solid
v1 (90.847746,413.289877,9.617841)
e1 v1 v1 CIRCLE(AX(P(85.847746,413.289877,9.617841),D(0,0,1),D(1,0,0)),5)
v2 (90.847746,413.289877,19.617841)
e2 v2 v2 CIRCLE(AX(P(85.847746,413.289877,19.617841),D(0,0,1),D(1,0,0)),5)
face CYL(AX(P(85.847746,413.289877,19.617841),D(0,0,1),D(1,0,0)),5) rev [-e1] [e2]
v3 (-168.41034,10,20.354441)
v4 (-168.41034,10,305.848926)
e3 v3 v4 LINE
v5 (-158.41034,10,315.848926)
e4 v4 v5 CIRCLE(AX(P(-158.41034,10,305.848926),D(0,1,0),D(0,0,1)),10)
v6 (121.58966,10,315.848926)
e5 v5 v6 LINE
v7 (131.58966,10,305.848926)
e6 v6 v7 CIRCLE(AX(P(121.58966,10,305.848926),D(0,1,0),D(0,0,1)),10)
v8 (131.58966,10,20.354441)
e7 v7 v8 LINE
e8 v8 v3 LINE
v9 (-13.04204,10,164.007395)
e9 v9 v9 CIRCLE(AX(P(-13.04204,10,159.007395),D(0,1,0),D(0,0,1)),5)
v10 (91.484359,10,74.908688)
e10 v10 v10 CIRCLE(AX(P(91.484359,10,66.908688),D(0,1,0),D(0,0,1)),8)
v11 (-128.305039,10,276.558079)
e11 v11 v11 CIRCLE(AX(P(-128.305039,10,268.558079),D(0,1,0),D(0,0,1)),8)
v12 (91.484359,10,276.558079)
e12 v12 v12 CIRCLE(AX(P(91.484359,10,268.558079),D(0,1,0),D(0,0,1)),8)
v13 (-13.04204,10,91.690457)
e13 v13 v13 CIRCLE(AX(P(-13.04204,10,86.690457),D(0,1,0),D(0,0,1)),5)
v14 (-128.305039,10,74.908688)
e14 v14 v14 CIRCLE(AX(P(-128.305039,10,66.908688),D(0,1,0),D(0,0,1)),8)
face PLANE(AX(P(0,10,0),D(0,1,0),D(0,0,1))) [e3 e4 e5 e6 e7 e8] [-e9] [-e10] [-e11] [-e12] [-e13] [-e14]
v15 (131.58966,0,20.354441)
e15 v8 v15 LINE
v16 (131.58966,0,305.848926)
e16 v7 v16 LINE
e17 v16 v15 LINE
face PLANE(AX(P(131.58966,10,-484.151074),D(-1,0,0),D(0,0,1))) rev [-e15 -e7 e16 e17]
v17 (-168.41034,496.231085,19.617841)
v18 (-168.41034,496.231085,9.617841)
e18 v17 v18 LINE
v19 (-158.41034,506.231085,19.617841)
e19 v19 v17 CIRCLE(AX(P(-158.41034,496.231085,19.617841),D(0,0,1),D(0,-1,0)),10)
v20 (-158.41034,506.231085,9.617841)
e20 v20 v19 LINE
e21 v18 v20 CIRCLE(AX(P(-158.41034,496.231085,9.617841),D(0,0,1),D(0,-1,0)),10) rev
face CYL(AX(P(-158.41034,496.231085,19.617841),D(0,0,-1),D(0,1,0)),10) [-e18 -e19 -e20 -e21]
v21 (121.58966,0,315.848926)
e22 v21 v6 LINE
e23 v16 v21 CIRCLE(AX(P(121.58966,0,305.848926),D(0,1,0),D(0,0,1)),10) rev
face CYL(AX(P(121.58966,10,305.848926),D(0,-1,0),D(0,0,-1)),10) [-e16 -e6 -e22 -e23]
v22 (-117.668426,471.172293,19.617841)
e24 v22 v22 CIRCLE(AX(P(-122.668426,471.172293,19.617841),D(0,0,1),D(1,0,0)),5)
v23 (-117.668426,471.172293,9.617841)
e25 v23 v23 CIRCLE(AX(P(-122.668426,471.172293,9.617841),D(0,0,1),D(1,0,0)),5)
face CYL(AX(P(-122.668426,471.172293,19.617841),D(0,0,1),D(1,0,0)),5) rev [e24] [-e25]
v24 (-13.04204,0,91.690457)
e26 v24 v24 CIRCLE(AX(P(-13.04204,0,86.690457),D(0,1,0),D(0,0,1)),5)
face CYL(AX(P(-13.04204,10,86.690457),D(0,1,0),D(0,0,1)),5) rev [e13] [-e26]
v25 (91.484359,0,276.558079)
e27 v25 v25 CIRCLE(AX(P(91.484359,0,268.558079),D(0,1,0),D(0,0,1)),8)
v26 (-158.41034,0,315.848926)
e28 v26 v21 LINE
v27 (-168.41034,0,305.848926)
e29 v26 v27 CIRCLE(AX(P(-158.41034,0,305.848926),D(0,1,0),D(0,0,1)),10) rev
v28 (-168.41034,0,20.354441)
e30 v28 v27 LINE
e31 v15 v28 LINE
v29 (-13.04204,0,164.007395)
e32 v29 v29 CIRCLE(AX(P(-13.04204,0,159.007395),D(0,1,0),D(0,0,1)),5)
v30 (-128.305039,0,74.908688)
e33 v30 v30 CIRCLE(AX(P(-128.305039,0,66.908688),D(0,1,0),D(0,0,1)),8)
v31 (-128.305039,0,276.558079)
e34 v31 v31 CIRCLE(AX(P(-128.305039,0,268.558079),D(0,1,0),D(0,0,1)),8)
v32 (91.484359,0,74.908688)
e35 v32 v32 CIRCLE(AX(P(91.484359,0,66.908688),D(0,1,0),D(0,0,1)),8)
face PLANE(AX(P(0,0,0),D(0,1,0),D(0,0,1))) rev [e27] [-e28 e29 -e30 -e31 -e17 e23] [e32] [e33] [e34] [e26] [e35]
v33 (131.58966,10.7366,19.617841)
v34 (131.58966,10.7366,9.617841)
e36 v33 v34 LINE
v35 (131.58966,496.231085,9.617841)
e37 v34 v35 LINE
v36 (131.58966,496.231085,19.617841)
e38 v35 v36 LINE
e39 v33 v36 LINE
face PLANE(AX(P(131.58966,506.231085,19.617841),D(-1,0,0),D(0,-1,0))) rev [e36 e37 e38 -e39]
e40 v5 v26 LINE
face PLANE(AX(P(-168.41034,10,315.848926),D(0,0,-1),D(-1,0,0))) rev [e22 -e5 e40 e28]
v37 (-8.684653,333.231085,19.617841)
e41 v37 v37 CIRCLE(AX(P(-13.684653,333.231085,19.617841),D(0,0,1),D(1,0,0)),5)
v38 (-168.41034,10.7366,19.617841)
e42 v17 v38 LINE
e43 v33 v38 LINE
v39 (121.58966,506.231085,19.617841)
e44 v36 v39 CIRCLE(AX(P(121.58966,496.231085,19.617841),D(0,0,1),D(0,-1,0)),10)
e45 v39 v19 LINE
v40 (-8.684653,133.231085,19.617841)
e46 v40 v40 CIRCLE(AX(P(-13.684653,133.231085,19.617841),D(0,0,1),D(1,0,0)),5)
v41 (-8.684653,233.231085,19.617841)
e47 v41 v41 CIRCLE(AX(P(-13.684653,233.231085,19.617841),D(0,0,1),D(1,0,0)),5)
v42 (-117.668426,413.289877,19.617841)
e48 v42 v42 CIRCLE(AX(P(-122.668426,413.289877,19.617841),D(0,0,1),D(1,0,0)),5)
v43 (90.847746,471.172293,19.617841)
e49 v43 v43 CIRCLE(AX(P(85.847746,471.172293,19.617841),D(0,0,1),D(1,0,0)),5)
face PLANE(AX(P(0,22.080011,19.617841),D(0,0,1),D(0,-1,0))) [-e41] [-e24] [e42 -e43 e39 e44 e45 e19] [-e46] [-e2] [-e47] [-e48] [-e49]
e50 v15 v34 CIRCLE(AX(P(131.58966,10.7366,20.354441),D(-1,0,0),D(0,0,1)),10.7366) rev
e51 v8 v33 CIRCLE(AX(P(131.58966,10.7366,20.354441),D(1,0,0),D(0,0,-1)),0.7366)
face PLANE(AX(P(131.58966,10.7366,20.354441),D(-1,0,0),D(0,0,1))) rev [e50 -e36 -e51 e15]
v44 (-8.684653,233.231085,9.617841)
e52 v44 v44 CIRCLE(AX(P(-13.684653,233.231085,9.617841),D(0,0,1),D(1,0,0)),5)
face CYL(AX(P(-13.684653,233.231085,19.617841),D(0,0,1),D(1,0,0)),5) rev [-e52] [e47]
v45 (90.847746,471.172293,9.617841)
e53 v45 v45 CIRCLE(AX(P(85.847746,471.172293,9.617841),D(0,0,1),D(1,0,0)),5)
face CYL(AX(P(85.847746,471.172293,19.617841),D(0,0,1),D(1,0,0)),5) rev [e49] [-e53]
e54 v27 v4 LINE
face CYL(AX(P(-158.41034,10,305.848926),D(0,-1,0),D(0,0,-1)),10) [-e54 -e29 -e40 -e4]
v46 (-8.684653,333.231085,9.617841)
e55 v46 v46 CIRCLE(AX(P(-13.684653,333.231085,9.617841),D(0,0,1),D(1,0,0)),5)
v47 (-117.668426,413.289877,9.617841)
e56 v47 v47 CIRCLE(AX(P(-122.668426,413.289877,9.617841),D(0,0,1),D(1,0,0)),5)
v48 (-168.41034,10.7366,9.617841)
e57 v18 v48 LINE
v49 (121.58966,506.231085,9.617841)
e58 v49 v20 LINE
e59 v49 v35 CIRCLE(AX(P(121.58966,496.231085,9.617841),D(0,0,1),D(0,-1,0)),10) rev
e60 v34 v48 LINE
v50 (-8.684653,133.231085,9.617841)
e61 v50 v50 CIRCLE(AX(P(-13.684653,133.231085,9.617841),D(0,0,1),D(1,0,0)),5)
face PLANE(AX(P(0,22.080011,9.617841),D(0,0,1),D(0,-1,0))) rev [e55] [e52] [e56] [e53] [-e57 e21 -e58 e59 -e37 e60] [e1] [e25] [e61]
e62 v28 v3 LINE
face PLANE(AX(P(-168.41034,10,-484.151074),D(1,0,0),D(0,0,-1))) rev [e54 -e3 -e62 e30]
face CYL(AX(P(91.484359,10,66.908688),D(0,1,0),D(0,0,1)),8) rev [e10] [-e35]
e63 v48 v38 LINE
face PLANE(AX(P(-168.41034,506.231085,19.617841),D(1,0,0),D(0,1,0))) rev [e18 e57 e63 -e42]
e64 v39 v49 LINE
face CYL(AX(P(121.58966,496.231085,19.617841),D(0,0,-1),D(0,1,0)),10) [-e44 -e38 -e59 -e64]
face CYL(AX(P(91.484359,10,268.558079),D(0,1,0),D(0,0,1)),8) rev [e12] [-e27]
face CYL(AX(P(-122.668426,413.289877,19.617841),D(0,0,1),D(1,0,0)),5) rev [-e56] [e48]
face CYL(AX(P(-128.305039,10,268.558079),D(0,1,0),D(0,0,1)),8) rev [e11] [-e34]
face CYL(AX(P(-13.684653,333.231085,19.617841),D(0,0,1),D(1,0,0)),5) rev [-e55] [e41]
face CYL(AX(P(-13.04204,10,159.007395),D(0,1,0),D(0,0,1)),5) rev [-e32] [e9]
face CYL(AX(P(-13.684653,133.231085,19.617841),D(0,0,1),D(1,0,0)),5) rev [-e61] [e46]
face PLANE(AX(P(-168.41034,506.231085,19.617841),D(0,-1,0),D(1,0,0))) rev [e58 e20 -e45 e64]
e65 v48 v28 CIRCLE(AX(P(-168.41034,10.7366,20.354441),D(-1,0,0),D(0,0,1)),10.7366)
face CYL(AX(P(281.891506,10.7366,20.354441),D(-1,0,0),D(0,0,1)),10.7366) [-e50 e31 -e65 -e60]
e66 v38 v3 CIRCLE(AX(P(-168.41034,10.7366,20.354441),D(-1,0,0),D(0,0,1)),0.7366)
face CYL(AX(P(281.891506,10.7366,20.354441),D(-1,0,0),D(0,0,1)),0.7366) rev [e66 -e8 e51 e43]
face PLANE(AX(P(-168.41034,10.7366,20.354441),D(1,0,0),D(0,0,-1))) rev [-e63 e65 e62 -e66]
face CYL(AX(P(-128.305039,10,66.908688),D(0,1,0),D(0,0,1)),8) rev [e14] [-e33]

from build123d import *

# Parameters (mm, degrees)
SKETCH3_W              = 300
SKETCH3_H              = 800
BASE_FLANGE1_DEPTH     = 10
SKETCHED_START         = -168.410340007
SKETCHED_BEND1_DEPTH   = 300
SKETCHED_BEND1_2_DEPTH = 300
BREAK_CORNER1_DEPTH    = 10
BREAK_CORNER1_START    = 9.617841009
BREAK_CORNER1_2_DEPTH  = 10
F_10_0MM_DOWEL_HOLE1_D = 10
F_10_0MM_DOWEL_HOLE2_D = 10
F_10_0MM_DOWEL_HOLE3_D = 10
F_16_0MM_DOWEL_HOLE1_D = 16


# Read off the part's stored shape, not the designer's step: Sketched Bend1, Break-Corner1
# Sheet-metal steps are written as plain solids
with BuildPart() as part:
    # Sketch3 → Base-Flange1 (new body)
    with BuildSketch(Plane(origin=(0, 0, 0), x_dir=(1, 0, 0), z_dir=(0, 1, 0))):
        with Locations((-18.410340007, 84.151074095)):
            Rectangle(SKETCH3_W, SKETCH3_H)
    extrude(amount=BASE_FLANGE1_DEPTH)

    # Sketched Bend1 outline → Sketched Bend1 (cut)
    with BuildSketch(Plane.YZ.offset(SKETCHED_START)):
        with BuildLine():
            Line((10, -484.151074095), (10, 9.643138567))
            ThreePointArc((10, 9.643138567), (2.888569702, 13.027572646), (0, 20.354441009))
            Line((0, 20.354441009), (0, -484.151074095))
            Line((0, -484.151074095), (10, -484.151074095))
        make_face()
    extrude(amount=SKETCHED_BEND1_DEPTH, mode=Mode.SUBTRACT)

    # Sketched Bend1 2 outline → Sketched Bend1 2 (add)
    with BuildSketch(Plane.YZ.offset(SKETCHED_START)):
        with BuildLine():
            Line((10.7366, 9.617841009), (506.231084896, 9.617841009))
            Line((506.231084896, 9.617841009), (506.231084896, 19.617841009))
            Line((506.231084896, 19.617841009), (10.7366, 19.617841009))
            ThreePointArc((10.7366, 19.617841009), (10.215745145, 19.833586154), (10, 20.354441009))
            Line((10, 20.354441009), (10, 9.643138567))
            ThreePointArc((10, 9.643138567), (10.368082861, 9.624167262), (10.7366, 9.617841009))
        make_face()
    extrude(amount=SKETCHED_BEND1_2_DEPTH)

    # Break-Corner1 outline → Break-Corner1 (cut)
    with BuildSketch(Plane(origin=(0, 0, 0), x_dir=(1, 0, 0), z_dir=(0, 1, 0))):
        with BuildLine():
            Line((131.589659993, -315.848925905), (131.589659993, -305.848925905))
            ThreePointArc((131.589659993, -305.848925905), (128.660727805, -312.919993717), (121.589659993, -315.848925905))
            Line((121.589659993, -315.848925905), (131.589659993, -315.848925905))
        make_face()
        with BuildLine():
            Line((-168.410340007, -315.848925905), (-158.410340007, -315.848925905))
            ThreePointArc((-158.410340007, -315.848925905), (-165.481407819, -312.919993717), (-168.410340007, -305.848925905))
            Line((-168.410340007, -305.848925905), (-168.410340007, -315.848925905))
        make_face()
    extrude(amount=BREAK_CORNER1_DEPTH, mode=Mode.SUBTRACT)

    # Break-Corner1 2 outline → Break-Corner1 2 (cut)
    with BuildSketch(Plane.XY.offset(BREAK_CORNER1_START)):
        with BuildLine():
            Line((131.589659993, 506.231084896), (121.589659993, 506.231084896))
            ThreePointArc((121.589659993, 506.231084896), (128.660727805, 503.302152708), (131.589659993, 496.231084896))
            Line((131.589659993, 496.231084896), (131.589659993, 506.231084896))
        make_face()
        with BuildLine():
            ThreePointArc((-168.410340007, 496.231084896), (-165.481407819, 503.302152708), (-158.410340007, 506.231084896))
            Line((-158.410340007, 506.231084896), (-168.410340007, 506.231084896))
            Line((-168.410340007, 506.231084896), (-168.410340007, 496.231084896))
        make_face()
    extrude(amount=BREAK_CORNER1_2_DEPTH, mode=Mode.SUBTRACT)

    # Ø10.0mm Dowel Hole1 (through all)
    with Locations(Plane.XY.offset(19.617841009)):
        with Locations((-13.684653237, 333.231084896), (-13.684653237, 233.231084896), (-13.684653237, 133.231084896)):
            Hole(F_10_0MM_DOWEL_HOLE1_D / 2)

    # Ø10.0mm Dowel Hole2 (through all)
    with Locations(Plane(origin=(0, 10, 0), x_dir=(1, 0, 0), z_dir=(0, 1, 0))):
        with Locations((-13.042040007, -86.690456915), (-13.042040007, -159.007394895)):
            Hole(F_10_0MM_DOWEL_HOLE2_D / 2)

    # Ø10.0mm Dowel Hole3 (through all)
    with Locations(Plane.XY.offset(19.617841009)):
        with Locations((85.847745748, 471.172292647), (85.847745748, 413.289877144), (-122.668425763, 413.289877144), (-122.668425763, 471.172292647)):
            Hole(F_10_0MM_DOWEL_HOLE3_D / 2)

    # Ø16.0mm Dowel Hole1 (through all)
    with Locations(Plane(origin=(0, 10, 0), x_dir=(1, 0, 0), z_dir=(0, 1, 0))):
        with Locations((-128.305039397, -66.908688048), (91.484359382, -66.908688048), (91.484359382, -268.558078866), (-128.305039397, -268.558078866)):
            Hole(F_16_0MM_DOWEL_HOLE1_D / 2)


solid = part.part
